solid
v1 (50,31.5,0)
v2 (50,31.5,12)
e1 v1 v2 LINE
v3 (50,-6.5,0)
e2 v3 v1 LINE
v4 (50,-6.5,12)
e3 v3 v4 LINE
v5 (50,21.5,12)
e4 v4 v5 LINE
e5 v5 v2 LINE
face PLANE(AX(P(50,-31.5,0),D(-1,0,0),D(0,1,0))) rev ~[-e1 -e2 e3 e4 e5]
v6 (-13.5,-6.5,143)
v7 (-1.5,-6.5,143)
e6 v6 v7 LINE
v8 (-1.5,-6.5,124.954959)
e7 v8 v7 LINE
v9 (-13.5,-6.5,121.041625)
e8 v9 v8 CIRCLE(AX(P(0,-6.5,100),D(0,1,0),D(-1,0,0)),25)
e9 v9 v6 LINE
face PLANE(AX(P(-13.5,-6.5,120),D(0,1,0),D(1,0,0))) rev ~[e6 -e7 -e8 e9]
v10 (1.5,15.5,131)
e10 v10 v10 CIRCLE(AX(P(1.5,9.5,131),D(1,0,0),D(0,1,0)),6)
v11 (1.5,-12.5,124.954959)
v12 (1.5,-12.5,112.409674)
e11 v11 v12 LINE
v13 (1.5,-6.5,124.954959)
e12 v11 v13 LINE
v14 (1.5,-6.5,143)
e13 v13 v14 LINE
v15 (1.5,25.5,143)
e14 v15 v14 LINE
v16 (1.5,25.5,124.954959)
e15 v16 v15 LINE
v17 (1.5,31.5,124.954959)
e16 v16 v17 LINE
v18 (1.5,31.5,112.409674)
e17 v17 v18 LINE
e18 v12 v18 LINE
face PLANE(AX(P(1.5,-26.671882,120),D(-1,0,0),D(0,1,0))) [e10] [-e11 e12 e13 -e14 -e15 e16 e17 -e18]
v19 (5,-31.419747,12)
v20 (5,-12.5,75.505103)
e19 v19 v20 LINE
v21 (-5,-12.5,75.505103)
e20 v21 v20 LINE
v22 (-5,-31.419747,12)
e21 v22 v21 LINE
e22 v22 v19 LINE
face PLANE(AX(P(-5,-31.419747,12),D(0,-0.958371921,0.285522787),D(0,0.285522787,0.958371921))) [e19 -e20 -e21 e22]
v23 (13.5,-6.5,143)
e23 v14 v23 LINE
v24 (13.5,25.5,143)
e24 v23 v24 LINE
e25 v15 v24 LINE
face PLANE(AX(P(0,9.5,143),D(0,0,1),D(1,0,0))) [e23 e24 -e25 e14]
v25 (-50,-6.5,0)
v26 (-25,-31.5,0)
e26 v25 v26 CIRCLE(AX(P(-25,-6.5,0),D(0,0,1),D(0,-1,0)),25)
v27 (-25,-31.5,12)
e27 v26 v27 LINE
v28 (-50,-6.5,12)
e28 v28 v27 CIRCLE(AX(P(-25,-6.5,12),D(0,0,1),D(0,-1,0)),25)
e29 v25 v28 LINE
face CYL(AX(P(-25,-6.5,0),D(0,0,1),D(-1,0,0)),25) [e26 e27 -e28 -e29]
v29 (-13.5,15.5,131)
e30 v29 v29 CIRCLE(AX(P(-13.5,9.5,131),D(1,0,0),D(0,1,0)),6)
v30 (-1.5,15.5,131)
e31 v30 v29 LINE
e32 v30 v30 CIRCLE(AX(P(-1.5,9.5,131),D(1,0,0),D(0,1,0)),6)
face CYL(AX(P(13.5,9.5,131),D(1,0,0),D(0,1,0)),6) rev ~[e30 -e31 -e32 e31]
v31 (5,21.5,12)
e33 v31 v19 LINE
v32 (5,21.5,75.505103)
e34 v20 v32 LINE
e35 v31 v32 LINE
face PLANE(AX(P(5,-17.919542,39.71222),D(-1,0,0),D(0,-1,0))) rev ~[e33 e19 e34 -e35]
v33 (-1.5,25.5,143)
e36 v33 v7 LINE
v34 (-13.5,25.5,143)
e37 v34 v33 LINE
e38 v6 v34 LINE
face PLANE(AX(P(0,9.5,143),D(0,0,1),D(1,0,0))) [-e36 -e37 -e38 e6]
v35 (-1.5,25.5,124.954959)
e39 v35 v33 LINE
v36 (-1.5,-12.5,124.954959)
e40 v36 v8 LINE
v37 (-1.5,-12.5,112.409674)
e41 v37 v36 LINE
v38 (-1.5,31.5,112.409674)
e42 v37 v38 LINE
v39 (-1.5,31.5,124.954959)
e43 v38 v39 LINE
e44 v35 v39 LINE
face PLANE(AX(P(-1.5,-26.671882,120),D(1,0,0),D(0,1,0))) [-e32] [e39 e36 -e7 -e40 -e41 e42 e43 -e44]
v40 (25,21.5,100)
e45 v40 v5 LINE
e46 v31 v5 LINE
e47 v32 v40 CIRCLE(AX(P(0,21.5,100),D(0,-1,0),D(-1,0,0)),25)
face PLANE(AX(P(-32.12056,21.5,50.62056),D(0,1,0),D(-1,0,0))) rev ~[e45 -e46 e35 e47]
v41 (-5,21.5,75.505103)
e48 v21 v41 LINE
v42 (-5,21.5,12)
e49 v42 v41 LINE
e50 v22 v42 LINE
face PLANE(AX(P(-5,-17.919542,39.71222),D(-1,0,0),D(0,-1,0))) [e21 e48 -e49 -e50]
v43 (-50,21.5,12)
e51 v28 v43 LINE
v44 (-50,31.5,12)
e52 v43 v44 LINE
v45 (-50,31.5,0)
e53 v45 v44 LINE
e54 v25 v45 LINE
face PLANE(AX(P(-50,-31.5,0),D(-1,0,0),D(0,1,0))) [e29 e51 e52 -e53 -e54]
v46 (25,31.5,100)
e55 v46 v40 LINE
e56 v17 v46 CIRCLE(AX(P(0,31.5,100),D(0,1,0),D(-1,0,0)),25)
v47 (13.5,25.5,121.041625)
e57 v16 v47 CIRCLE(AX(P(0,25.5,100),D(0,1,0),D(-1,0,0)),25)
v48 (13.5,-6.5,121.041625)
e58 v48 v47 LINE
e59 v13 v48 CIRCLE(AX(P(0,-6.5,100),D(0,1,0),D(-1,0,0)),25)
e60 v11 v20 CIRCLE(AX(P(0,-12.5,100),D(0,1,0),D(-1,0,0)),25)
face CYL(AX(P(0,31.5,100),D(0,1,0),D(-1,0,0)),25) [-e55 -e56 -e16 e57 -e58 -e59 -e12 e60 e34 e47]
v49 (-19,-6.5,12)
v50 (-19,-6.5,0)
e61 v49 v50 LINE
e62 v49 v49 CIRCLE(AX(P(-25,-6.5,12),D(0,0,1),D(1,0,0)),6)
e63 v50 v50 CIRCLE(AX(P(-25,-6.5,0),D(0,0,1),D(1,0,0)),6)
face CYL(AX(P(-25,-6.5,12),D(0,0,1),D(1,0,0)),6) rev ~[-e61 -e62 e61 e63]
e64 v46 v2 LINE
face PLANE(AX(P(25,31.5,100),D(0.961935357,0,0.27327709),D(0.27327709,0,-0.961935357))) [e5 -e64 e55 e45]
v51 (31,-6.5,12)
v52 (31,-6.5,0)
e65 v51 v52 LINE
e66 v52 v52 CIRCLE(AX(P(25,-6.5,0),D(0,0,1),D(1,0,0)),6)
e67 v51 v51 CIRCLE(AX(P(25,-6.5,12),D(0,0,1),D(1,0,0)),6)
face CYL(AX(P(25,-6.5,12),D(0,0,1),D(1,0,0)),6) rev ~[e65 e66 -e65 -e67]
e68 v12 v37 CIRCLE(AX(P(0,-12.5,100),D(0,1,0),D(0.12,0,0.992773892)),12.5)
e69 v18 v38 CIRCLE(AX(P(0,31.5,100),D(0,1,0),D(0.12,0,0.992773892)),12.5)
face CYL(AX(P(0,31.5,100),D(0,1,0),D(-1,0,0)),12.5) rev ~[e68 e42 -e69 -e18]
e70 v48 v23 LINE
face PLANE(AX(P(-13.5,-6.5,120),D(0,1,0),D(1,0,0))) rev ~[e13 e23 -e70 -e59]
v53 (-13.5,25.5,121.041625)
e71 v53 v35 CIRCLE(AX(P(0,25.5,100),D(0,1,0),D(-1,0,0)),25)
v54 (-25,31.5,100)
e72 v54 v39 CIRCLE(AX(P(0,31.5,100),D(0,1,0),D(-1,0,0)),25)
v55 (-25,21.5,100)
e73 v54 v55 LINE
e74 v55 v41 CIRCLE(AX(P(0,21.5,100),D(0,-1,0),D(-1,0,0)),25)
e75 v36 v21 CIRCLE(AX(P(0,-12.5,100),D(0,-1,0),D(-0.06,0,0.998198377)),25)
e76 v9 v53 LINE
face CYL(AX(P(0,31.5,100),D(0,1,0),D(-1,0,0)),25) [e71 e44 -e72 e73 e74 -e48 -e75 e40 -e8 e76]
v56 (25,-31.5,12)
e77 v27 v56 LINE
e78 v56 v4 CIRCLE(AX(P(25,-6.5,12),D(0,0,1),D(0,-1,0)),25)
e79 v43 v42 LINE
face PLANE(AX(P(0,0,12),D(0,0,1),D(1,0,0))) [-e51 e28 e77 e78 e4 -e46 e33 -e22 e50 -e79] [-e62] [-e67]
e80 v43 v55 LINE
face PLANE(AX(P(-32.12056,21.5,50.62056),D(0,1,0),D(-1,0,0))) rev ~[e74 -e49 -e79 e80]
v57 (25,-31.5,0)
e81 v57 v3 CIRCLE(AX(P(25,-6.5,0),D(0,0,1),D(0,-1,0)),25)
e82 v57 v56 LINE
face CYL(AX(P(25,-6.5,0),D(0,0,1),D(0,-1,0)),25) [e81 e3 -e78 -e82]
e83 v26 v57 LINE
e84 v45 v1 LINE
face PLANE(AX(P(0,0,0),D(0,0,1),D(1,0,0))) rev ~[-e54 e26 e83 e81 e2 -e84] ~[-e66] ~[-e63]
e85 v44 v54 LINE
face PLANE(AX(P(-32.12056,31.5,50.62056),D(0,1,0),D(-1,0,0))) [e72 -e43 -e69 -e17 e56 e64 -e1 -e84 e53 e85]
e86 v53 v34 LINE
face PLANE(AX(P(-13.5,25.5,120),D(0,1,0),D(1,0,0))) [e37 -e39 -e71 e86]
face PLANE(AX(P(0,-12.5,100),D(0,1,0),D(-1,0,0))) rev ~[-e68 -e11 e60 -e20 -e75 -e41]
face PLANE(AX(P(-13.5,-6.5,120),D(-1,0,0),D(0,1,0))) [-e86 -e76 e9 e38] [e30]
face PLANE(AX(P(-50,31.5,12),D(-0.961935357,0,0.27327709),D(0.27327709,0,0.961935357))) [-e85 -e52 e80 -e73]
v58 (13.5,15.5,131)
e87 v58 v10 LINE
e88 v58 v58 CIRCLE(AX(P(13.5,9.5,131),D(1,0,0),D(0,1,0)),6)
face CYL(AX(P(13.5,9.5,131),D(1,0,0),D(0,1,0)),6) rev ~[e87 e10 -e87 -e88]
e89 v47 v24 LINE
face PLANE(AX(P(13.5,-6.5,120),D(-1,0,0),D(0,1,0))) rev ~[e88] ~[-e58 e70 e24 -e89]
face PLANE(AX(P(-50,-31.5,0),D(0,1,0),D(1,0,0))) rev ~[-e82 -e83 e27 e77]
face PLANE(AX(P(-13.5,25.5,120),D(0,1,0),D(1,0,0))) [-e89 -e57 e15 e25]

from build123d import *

# Parameters (mm, degrees)
F0_W           = 100
F0_H           = 63
F1_DEPTH       = 12
F2_R           = 25
F3_R           = 6
F4_DEPTH       = 12
F5_R           = 6
F6_DEPTH       = 12
F7_R           = 25
F7_R_2         = 12.5
F8_DEPTH       = 44
F12_DEPTH      = 10
F14_DEPTH      = 10
F16_W          = 27
F16_H          = 32
F17_DEPTH      = 23
F18_W          = 10
F18_H          = 34
F21_DEPTH      = 10
F22_W          = 3
F22_H          = 60
F23_DEPTH      = 25
F23_DEPTH_BACK = 25
F24_R          = 6
F25_DEPTH      = 63.501


# Not quite as in the source:
# - a feature of the source that left no trace in its solid (it failed there, or was rolled back) is left out


with BuildPart() as f1:
    # F0 (on Top) → F1 (new body)
    with BuildSketch(Plane.XY):
        Rectangle(F0_W, F0_H)
    extrude(amount=F1_DEPTH)

    # F2
    f2_edges = [f1.edges().sort_by_distance(p)[0] for p in [
        (-50, -31.5, 6),
        (50, -31.5, 6),
    ]]
    fillet(f2_edges, radius=F2_R)

    # F3 (on face) → F4 (cut, through all)
    with BuildSketch(Plane.XY.offset(12)):
        with Locations((-25, -6.5)):
            Circle(F3_R)
    extrude(amount=-F4_DEPTH, mode=Mode.SUBTRACT)

    # F5 (on face) → F6 (cut, through all)
    with BuildSketch(Plane.XY.offset(12)):
        with Locations((25, -6.5)):
            Circle(F5_R)
    extrude(amount=-F6_DEPTH, mode=Mode.SUBTRACT)



with BuildPart() as f8:
    # F7 (on face) → F8 (new body)
    with BuildSketch(Plane(origin=(0, 31.5, 0), x_dir=(-1, 0, 0), z_dir=(0, 1, 0))):
        with Locations((0, 100)):
            Circle(F7_R)
        with Locations((0, 100)):
            Circle(F7_R_2, mode=Mode.SUBTRACT)
    extrude(amount=-F8_DEPTH)


with BuildPart() as f1_1:
    add(f1.part)

    add(f8.part)  # F12 merges F8
    # F11 (on face) → F12 (join)
    with BuildSketch(Plane(origin=(0, 31.5, 0), x_dir=(-1, 0, 0), z_dir=(0, 1, 0))):
        Polygon((-25, 100), (-50, 12), (-25, 12), align=None)
    extrude(amount=-F12_DEPTH)

    # F13 (on face) → F14 (join)
    with BuildSketch(Plane(origin=(0, 31.5, 0), x_dir=(-1, 0, 0), z_dir=(0, 1, 0))):
        Polygon((25, 100), (25, 12), (50, 12), align=None)
        with BuildLine():
            Line((-25, 12), (25, 12))
            Line((25, 12), (25, 100))
            ThreePointArc((25, 100), (0, 75), (-25, 100))
            Line((-25, 100), (-25, 12))
        make_face()
    extrude(amount=-F14_DEPTH)

    # F16 (on offset) → F17 (join)
    with BuildSketch(Plane.XY.offset(120)):
        with Locations((0, 9.5)):
            Rectangle(F16_W, F16_H)
    extrude(amount=F17_DEPTH)

    # F18 (on face) → F19 (join, up to the next surface of F1)
    with BuildSketch(Plane.XY.offset(12)):
        with Locations((0, 4.5)):
            Rectangle(F18_W, F18_H)
    extrude(until=Until.NEXT)

    # F20 (on face) → F21 (join)
    with BuildSketch(Plane(origin=(-5, 0, 0), x_dir=(0, -1, 0), z_dir=(-1, 0, 0))):
        Polygon((31.4197465777, 12), (12.5, 75.5051025722), (12.5, 12), align=None)
    extrude(amount=-F21_DEPTH)

    # F22 (on offset) → F23 (cut, two sides)
    with BuildSketch(Plane.XY.offset(120)) as f23_sk:
        with Locations((0, 3.3281182433)):
            Rectangle(F22_W, F22_H)
    extrude(amount=-F23_DEPTH, mode=Mode.SUBTRACT)
    extrude(f23_sk.sketch, amount=F23_DEPTH_BACK, mode=Mode.SUBTRACT)

    # F24 (on face) → F25 (cut, through all)
    with BuildSketch(Plane.YZ.offset(13.5)):
        with Locations((9.5, 131)):
            Circle(F24_R)
    extrude(amount=-F25_DEPTH, mode=Mode.SUBTRACT)


solid = f1_1.part
